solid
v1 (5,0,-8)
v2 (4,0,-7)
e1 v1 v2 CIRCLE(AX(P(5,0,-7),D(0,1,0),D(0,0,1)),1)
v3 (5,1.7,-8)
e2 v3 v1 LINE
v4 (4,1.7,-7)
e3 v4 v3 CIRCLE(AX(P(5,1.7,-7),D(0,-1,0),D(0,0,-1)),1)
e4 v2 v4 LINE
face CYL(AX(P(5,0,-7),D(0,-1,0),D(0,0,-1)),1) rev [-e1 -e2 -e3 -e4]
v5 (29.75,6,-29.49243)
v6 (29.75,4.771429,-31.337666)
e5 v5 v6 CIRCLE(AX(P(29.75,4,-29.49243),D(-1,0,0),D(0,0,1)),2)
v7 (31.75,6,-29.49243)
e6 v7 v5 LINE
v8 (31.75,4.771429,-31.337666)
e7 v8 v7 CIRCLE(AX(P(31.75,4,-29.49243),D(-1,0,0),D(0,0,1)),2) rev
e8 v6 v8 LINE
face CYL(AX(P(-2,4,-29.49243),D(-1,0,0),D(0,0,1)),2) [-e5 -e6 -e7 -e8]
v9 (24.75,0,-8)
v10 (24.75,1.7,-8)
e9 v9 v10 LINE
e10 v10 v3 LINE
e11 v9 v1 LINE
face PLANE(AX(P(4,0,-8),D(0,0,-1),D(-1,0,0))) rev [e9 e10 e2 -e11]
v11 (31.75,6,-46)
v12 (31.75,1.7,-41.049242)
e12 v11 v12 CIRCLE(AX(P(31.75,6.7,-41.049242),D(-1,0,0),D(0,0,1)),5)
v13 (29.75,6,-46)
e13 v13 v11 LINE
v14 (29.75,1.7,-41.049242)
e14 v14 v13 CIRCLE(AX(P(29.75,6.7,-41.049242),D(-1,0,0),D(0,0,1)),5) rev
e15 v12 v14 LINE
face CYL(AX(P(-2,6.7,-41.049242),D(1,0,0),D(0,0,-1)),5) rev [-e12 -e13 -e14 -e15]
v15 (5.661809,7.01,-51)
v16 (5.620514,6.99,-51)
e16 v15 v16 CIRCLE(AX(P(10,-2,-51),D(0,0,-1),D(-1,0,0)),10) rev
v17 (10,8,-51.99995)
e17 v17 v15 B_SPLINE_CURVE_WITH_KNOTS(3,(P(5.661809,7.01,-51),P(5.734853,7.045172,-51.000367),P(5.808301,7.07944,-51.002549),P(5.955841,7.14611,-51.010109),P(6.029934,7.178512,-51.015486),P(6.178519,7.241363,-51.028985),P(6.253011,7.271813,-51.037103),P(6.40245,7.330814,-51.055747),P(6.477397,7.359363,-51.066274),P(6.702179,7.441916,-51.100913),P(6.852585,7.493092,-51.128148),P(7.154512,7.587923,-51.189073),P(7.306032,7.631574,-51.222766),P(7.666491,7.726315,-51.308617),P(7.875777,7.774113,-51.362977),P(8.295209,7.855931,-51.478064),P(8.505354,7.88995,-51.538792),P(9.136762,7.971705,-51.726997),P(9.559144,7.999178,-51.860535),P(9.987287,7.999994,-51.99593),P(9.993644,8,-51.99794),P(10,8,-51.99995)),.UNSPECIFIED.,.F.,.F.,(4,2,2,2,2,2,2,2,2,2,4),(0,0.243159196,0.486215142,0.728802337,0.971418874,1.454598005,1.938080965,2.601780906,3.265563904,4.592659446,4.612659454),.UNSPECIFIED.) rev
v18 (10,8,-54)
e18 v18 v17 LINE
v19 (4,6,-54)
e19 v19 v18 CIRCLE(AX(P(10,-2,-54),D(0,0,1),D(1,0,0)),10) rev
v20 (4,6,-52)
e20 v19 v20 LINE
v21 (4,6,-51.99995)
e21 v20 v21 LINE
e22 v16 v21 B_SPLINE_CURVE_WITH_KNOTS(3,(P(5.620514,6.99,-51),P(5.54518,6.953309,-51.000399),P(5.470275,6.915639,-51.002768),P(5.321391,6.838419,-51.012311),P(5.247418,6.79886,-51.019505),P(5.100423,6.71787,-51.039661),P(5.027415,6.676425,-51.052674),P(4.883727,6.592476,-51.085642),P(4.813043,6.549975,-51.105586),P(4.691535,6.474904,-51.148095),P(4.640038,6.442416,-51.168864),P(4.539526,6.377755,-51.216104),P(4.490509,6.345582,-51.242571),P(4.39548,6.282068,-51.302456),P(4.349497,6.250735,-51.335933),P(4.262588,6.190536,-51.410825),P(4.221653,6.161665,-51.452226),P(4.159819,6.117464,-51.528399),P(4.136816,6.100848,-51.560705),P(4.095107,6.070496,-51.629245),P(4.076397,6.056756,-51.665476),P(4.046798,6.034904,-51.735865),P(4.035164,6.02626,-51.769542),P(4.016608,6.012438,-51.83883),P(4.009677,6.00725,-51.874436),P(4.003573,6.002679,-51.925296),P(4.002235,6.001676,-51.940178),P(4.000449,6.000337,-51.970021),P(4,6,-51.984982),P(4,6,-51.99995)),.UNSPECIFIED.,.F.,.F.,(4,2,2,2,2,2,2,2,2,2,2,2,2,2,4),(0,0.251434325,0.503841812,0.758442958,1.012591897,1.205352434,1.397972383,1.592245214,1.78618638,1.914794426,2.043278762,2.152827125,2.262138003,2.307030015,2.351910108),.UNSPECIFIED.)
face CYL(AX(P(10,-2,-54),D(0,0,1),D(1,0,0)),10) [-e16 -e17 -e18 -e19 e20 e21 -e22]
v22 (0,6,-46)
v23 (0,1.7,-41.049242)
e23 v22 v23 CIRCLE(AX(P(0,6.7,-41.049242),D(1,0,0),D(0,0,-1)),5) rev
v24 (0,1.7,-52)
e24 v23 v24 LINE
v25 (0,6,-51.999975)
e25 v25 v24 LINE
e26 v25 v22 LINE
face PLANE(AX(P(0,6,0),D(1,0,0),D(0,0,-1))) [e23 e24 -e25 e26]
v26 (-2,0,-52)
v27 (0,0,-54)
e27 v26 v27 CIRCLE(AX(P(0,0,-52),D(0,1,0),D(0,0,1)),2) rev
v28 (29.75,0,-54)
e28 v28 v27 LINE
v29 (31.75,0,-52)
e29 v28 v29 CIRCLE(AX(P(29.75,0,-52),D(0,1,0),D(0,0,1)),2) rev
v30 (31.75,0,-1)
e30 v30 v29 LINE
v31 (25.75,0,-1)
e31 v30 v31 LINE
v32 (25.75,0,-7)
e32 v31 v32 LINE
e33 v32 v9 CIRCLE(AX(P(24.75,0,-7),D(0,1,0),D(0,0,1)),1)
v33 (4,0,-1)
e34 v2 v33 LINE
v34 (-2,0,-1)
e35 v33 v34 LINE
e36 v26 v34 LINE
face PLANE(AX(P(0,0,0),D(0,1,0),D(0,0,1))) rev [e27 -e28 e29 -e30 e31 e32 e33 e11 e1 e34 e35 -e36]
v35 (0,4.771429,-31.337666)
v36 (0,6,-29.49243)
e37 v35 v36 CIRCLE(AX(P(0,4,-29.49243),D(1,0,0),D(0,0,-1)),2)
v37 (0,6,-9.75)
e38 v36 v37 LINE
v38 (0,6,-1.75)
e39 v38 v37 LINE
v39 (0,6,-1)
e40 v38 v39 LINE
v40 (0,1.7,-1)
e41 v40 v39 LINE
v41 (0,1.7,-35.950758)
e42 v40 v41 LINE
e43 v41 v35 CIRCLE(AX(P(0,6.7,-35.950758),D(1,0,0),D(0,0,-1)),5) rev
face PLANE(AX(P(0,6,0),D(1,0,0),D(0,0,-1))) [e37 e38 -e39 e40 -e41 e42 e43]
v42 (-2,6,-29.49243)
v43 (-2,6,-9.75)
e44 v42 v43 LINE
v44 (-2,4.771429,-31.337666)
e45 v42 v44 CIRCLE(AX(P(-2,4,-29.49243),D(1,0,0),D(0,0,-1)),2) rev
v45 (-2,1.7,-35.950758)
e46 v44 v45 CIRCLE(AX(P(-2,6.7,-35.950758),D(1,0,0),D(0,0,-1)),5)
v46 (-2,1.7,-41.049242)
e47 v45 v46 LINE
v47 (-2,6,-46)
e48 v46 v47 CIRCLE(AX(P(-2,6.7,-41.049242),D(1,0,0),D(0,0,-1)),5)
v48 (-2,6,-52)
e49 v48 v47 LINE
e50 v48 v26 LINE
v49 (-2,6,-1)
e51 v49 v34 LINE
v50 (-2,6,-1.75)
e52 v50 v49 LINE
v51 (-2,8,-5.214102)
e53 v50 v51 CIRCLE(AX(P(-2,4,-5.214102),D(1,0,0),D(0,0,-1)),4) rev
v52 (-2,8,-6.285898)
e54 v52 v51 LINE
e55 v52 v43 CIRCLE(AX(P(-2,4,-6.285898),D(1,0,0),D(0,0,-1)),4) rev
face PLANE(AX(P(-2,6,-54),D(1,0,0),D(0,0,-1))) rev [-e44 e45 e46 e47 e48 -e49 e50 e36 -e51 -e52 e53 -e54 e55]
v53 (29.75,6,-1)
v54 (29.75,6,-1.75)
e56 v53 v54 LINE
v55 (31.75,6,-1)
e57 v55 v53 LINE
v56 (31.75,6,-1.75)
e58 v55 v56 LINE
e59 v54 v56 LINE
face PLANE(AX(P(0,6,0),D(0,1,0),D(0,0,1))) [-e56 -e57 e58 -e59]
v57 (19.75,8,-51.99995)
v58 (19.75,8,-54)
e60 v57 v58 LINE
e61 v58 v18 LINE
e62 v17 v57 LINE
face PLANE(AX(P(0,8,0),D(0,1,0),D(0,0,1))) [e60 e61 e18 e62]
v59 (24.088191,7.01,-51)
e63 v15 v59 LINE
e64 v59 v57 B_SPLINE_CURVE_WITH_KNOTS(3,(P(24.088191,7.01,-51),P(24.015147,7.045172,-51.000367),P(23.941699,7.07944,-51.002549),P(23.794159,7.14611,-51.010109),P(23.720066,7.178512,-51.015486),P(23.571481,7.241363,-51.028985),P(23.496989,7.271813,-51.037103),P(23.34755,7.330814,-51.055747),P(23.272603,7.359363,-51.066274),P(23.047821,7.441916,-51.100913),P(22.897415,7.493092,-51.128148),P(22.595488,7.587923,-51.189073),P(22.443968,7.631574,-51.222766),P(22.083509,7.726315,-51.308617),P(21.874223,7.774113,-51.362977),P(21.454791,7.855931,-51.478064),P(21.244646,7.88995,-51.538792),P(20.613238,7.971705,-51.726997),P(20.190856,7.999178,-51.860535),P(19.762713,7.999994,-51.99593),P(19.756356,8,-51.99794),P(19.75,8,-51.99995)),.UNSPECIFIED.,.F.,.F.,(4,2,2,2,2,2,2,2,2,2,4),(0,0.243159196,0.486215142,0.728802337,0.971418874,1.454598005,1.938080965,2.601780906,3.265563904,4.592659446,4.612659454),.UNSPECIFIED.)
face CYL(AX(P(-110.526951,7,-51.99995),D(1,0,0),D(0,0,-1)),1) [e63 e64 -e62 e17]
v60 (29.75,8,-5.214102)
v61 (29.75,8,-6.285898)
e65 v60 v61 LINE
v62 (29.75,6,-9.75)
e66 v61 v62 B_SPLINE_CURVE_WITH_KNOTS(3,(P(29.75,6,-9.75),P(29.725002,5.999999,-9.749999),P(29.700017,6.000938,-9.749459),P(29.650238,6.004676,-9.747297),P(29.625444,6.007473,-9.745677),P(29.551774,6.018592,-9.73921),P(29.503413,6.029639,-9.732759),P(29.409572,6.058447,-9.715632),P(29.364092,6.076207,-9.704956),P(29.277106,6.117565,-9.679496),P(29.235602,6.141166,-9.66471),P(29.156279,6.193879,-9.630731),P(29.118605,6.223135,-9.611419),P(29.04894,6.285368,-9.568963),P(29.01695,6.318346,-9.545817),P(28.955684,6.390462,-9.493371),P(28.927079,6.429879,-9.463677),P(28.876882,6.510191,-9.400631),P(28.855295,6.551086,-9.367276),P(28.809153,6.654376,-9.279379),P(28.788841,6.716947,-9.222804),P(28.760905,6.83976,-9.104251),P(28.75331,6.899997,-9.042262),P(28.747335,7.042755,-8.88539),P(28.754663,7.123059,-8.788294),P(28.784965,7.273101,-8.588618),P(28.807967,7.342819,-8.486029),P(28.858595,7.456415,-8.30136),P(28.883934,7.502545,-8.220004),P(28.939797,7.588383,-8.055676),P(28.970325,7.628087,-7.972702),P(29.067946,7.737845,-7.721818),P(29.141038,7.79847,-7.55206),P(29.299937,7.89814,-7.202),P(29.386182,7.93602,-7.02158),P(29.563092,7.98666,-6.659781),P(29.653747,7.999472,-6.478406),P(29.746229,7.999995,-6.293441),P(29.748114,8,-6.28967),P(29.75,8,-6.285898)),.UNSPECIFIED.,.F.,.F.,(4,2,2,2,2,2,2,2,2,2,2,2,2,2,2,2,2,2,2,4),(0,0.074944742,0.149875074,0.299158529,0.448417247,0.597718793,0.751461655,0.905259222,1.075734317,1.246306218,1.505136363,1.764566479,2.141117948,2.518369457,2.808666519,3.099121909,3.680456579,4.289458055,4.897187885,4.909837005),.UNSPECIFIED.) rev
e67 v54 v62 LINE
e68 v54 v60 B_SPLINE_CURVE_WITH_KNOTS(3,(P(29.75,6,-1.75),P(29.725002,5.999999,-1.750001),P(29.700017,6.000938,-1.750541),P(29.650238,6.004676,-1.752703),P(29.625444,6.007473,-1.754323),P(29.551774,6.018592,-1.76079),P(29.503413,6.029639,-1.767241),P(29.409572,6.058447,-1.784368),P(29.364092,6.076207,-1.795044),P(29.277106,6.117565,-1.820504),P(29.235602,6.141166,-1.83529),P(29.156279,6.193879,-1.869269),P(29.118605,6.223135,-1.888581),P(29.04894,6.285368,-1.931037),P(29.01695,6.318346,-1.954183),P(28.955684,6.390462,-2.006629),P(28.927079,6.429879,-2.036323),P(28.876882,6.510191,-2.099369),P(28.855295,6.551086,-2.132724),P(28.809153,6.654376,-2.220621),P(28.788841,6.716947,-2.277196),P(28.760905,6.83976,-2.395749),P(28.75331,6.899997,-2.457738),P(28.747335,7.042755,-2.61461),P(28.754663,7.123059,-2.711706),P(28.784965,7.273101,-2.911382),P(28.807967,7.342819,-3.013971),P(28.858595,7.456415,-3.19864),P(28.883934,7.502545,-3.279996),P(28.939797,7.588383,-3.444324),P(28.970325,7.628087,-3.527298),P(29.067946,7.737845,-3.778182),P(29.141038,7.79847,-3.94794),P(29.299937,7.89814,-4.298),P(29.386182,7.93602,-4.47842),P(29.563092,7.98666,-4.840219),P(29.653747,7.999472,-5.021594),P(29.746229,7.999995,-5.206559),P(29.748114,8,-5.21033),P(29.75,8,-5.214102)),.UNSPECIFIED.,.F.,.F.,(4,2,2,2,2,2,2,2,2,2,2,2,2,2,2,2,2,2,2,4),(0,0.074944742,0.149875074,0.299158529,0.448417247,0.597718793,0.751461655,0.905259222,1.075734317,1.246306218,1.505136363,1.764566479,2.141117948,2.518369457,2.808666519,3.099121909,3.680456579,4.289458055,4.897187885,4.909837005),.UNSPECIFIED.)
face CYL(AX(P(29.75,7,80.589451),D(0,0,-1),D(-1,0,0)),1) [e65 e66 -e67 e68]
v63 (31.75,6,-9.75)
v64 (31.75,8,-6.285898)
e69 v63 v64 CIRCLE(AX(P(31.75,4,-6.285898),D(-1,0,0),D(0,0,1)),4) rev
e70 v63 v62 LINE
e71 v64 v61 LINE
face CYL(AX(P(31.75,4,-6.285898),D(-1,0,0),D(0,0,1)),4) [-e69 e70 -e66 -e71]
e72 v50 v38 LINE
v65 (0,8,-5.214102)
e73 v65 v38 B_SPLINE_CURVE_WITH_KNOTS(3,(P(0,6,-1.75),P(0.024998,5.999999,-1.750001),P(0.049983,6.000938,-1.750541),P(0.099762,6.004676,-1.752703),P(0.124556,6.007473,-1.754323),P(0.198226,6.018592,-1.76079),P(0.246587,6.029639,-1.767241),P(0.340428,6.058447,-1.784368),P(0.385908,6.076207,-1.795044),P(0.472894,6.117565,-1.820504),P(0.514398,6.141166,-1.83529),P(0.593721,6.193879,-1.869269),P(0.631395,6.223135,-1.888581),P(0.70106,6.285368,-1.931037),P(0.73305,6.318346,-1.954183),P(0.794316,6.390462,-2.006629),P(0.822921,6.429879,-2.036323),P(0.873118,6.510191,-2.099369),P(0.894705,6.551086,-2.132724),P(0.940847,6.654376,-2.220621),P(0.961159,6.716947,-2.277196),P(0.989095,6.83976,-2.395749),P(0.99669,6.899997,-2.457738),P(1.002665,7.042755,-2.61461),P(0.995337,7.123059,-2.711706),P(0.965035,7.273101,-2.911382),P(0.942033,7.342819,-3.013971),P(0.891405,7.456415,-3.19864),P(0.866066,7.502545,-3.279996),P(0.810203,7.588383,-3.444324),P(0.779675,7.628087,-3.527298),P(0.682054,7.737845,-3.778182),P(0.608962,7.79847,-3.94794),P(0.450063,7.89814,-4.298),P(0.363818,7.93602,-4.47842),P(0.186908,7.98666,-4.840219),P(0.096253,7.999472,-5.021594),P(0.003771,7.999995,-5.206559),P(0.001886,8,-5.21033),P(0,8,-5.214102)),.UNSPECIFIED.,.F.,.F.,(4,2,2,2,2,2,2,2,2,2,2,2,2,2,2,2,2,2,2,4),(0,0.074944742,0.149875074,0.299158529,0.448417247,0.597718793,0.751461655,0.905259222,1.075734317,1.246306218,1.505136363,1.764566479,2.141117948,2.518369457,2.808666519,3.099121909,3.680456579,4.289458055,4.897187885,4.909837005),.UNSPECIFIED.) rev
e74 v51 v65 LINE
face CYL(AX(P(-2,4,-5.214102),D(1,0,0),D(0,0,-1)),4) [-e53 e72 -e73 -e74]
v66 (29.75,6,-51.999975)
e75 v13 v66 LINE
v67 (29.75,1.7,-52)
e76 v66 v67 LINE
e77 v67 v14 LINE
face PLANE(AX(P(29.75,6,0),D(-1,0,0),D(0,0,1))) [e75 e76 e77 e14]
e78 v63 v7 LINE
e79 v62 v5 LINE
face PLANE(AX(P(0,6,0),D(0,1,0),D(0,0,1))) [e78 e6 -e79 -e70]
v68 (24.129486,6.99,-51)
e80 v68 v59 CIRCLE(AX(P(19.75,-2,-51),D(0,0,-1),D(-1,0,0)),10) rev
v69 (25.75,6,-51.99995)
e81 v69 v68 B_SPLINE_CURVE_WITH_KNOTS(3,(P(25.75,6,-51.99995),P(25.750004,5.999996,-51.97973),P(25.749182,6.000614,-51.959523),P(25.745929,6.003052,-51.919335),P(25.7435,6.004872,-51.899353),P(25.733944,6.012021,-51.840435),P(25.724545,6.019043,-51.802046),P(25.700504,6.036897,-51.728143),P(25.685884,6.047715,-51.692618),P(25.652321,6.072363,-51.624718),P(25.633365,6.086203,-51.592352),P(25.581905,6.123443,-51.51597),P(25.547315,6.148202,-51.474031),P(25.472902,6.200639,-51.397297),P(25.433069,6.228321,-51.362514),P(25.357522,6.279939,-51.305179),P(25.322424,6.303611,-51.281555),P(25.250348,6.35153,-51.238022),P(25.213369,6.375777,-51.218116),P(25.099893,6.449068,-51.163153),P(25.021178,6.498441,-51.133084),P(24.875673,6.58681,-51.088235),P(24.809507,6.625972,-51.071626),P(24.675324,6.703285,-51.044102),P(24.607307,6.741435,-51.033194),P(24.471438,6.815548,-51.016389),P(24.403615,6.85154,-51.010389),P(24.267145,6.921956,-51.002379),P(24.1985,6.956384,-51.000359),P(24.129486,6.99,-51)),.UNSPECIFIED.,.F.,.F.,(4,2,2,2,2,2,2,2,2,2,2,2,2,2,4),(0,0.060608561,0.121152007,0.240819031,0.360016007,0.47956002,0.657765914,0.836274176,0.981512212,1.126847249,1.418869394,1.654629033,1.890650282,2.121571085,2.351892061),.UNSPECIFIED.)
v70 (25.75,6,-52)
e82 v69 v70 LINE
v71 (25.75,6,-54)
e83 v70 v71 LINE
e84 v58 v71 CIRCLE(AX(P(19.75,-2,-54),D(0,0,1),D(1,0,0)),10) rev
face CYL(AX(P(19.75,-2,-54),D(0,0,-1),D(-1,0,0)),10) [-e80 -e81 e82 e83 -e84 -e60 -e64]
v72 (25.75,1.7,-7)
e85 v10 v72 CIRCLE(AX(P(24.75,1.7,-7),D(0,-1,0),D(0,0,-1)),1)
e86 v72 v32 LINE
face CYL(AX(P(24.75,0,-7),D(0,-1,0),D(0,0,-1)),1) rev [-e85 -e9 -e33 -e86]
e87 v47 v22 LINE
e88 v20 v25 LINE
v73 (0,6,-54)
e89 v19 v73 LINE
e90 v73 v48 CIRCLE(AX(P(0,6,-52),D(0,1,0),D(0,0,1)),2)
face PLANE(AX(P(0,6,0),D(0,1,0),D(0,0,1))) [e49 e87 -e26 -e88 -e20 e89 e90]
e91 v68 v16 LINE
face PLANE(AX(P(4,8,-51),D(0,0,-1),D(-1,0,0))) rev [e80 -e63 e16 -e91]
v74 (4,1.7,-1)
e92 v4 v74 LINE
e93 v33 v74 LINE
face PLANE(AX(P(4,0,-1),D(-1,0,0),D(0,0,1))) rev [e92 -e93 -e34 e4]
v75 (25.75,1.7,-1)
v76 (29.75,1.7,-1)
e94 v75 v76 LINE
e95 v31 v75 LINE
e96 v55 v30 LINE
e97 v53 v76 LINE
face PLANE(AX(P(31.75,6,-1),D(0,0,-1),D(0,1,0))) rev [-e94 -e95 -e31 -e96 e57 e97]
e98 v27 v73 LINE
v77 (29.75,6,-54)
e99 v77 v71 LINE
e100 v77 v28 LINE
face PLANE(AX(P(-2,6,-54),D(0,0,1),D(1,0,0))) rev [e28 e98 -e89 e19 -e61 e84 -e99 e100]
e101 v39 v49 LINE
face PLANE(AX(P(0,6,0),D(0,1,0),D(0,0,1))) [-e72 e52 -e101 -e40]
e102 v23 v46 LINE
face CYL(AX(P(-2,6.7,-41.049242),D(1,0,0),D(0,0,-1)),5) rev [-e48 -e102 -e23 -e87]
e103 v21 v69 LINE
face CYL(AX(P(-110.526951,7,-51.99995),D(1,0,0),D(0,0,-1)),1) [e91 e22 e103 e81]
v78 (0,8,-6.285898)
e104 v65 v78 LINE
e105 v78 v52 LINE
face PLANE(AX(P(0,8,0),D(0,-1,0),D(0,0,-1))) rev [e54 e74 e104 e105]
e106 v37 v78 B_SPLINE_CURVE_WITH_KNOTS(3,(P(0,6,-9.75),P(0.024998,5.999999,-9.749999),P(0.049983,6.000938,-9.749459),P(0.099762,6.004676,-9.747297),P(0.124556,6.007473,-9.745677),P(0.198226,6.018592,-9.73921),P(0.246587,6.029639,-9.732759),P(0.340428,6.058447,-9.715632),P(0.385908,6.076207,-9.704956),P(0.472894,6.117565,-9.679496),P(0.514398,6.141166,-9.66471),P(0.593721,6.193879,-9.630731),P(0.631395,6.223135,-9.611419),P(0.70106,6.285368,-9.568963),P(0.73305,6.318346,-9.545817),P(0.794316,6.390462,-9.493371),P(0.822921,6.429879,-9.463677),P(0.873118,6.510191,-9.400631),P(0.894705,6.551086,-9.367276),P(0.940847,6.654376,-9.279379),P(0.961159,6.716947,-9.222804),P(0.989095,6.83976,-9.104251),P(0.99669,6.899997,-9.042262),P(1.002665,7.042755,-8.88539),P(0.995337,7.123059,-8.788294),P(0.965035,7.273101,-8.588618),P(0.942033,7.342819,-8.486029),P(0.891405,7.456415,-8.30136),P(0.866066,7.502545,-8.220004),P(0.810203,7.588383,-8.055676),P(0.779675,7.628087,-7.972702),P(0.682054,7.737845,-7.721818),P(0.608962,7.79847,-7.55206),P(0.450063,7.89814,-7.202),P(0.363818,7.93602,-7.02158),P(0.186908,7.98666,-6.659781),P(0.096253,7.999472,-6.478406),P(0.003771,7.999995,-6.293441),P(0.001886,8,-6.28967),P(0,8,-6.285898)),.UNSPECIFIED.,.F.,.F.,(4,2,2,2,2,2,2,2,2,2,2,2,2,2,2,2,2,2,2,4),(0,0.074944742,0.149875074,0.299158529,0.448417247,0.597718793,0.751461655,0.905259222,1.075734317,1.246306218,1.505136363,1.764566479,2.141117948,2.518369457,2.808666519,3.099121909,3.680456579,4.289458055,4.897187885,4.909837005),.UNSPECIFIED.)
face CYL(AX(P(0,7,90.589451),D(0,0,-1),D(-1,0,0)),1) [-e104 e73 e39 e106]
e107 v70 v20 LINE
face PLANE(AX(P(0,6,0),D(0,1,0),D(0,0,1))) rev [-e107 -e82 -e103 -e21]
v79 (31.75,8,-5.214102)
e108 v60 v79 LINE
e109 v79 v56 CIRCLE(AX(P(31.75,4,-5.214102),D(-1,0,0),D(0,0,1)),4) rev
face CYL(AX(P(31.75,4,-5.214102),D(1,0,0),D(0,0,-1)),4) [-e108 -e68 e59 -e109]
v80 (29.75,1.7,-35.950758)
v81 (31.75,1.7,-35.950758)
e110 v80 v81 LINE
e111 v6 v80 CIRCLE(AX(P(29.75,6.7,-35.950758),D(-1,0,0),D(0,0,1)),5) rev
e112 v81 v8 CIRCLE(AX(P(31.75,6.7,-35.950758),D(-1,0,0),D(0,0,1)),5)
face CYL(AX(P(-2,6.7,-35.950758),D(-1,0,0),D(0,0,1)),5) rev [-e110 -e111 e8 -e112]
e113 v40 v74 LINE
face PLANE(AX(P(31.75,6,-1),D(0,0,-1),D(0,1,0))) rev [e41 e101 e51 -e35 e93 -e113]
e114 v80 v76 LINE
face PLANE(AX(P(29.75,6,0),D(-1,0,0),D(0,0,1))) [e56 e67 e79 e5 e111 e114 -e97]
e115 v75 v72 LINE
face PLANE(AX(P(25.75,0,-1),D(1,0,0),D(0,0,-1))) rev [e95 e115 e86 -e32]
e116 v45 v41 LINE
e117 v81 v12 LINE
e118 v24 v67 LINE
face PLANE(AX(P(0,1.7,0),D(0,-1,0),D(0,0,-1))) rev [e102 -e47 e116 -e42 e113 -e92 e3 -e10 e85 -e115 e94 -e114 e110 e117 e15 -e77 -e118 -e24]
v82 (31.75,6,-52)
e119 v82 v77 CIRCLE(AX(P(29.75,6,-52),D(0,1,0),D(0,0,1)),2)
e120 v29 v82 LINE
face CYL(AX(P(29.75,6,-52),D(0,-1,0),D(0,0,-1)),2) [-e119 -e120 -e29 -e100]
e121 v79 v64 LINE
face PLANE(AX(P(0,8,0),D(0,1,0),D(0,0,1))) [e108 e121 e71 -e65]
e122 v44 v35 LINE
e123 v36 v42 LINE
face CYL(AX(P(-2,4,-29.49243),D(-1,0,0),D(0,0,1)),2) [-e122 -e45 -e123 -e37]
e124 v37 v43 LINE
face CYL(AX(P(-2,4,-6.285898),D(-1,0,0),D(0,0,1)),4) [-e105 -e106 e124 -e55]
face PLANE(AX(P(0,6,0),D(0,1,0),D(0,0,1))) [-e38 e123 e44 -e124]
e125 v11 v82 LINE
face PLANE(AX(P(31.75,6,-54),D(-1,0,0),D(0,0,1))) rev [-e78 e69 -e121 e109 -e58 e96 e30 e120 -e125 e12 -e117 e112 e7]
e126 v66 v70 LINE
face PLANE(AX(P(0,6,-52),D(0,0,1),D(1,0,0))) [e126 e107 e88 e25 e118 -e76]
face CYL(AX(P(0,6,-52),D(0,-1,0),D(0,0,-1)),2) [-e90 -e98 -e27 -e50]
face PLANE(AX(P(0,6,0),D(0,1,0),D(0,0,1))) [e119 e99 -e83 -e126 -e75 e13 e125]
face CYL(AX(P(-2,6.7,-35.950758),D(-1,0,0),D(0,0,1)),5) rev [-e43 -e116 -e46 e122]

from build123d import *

# Parameters (mm, degrees)
SKETCH1_W               = 33.75000000000001
SKETCH1_H               = 55.99999999999999
SKETCH1_W_2             = 29.750000000000004
SKETCH1_H_2             = 52.00000000000001
BOSS_EXTRUDE1_DEPTH     = 6
BOSS_EXTRUDE2_DEPTH     = 1.7
SKETCH3_W               = 29.750000000000004
SKETCH3_H               = 4.3
CUT_EXTRUDE1_DEPTH      = 63.92902748334825
SKETCH5_W               = 21.750000000000004
SKETCH5_H               = 2.999999999999986
SKETCH5_W_2             = 2.9999999999999996
SKETCH5_H_2             = 8
BOSS_EXTRUDE3_DEPTH     = 2
CUT_EXTRUDE2_DEPTH      = 62.66137364671663
CUT_EXTRUDE2_DEPTH_BACK = 62.66137364671663
CUT_EXTRUDE3_DEPTH      = 62.66137364671663
CUT_EXTRUDE3_DEPTH_BACK = 62.66137364671663
CUT_EXTRUDE4_START      = -21.75
CUT_EXTRUDE4_DEPTH      = 21.75
FILLET1_R               = 10
FILLET2_R               = 4
CUT_EXTRUDE5_DEPTH      = 65.17992314238798
SKETCH12_W              = 21.750000000000004
SKETCH12_H              = 6.999999999999999
CUT_EXTRUDE6_DEPTH      = 63.958339642557306
FILLET4_R               = 2
FILLET5_R               = 1
CUT_EXTRUDE7_DEPTH      = 64.15110873264877
CUT_EXTRUDE7_DEPTH_BACK = 64.15110873264877
SKETCH13_W              = 14.999999999999996
SKETCH13_H              = 4.300000000000001
FILLET6_R               = 5
FILLET7_R               = 2


# Read off the part's stored shape, not the designer's step: Cut-Extrude4
with BuildPart() as part:
    # Sketch1 → Boss-Extrude1 (new body)
    with BuildSketch(Plane(origin=(0, 0, 0), x_dir=(1, 0, 0), z_dir=(0, 1, 0))):
        with Locations((14.875000000000002, 25.999999999999996)):
            Rectangle(SKETCH1_W, SKETCH1_H)
        with Locations((14.875000000000002, 26.000000000000004)):
            Rectangle(SKETCH1_W_2, SKETCH1_H_2, mode=Mode.SUBTRACT)
    extrude(amount=BOSS_EXTRUDE1_DEPTH)

    # Sketch2 → Boss-Extrude2 (add)
    with BuildSketch(Plane.XZ):
        Polygon((-1.9999999999999996, 2), (31.749999999999993, 2), (31.75, -53.99999999999999), (-1.9999999999999927, -53.99999999999999), align=None)
    extrude(amount=-BOSS_EXTRUDE2_DEPTH)

    # Sketch3 → Cut-Extrude1 (cut, through all)
    with BuildSketch(Plane(origin=(0, 0, 0), x_dir=(-1, 0, 0), z_dir=(0, 0, -1))):
        with Locations((-14.875000000000002, 3.85)):
            Rectangle(SKETCH3_W, SKETCH3_H)
    extrude(amount=-CUT_EXTRUDE1_DEPTH, mode=Mode.SUBTRACT)

    # Sketch5 → Boss-Extrude3 (add)
    with BuildSketch(Plane(origin=(0, 6, 0), x_dir=(1, 0, 0), z_dir=(0, 1, 0))):
        with Locations((14.875000000000002, 52.5)):
            Rectangle(SKETCH5_W, SKETCH5_H)
        with Locations((-0.4999999999999998, 5.75)):
            Rectangle(SKETCH5_W_2, SKETCH5_H_2)
        Polygon((31.750000000000014, 9.750000000000004), (28.75000000000001, 9.750000000000004), (28.750000000000014, 1.7500000000000033), (31.75000000000002, 1.750000000000004), align=None)
    extrude(amount=BOSS_EXTRUDE3_DEPTH)

    # Sketch6 → Cut-Extrude2 (cut, two sides: drawn at the far end of the back side and taken through both)
    with BuildSketch(Plane.XY.offset(-1.7499999999999998).offset(-CUT_EXTRUDE2_DEPTH_BACK)):
        with BuildLine():
            Line((1, 8), (0, 8))
            ThreePointArc((0, 8), (0.7071067811865474, 7.707106781186548), (1.0000000000000002, 7.000000000000001))
            Line((1, 7.000000000000001), (1, 8))
        make_face()
        with BuildLine():
            Line((1, 6), (1, 7.000000000000001))
            ThreePointArc((1.0000000000000002, 7.000000000000001), (0.7071067811865479, 6.292893218813453), (1.2e-16, 6))
            Line((0, 6), (1, 6))
        make_face()
    extrude(amount=CUT_EXTRUDE2_DEPTH + CUT_EXTRUDE2_DEPTH_BACK, mode=Mode.SUBTRACT)

    # Sketch7 → Cut-Extrude3 (cut, two sides: drawn at the far end of the back side and taken through both)
    with BuildSketch(Plane.XY.offset(-1.749999999999997).offset(-CUT_EXTRUDE3_DEPTH_BACK)):
        with BuildLine():
            Line((28.750000000000014, 6), (29.75, 6))
            ThreePointArc((29.75, 6), (29.042893218813454, 6.292893218813452), (28.75, 7))
            Line((28.750000000000014, 7), (28.750000000000014, 6))
        make_face()
        with BuildLine():
            Line((28.750000000000014, 8), (28.750000000000014, 7))
            ThreePointArc((28.75, 7), (29.042893218813454, 7.707106781186548), (29.75, 8))
            Line((29.75, 8), (28.750000000000014, 8))
        make_face()
    extrude(amount=CUT_EXTRUDE3_DEPTH + CUT_EXTRUDE3_DEPTH_BACK, mode=Mode.SUBTRACT)

    # Cut-Extrude4 outline → Cut-Extrude4 (cut)
    with BuildSketch(Plane.ZY.offset(-4).offset(CUT_EXTRUDE4_START)):
        with BuildLine():
            Line((-51, 6), (-51, 6.99))
            ThreePointArc((-51, 6.99), (-51.296387635, 6.289366479), (-51.99995, 5.999999999))
            Line((-51.99995, 5.999999999), (-51, 6))
        make_face()
        with BuildLine():
            ThreePointArc((-51.99995, 8.000000001), (-51.296387635, 7.710633521), (-51, 7.01))
            Line((-51, 7.01), (-51, 8))
            Line((-51, 8), (-51.99995, 8.000000001))
        make_face()
    extrude(amount=CUT_EXTRUDE4_DEPTH, mode=Mode.SUBTRACT)

    # Fillet1
    # the kernel refuses this fillet: 10 mm, written as the material it takes off along each edge
    with BuildSketch(Plane(origin=(4, 8, -36.99994999999842), x_dir=(1.1324e-13, -1, 0), z_dir=(0, 0, -1))) as fillet1_piece_1:
        with BuildLine():
            CenterArc((10.000000000000679, -5.999999999999498), FILLET1_R, 143.13010235415956, 36.86989764584689)
            Line((6.7946e-13, -6.000000000000631), (-0.19999999999931983, -6.000000000000653))
            Line((-0.19999999999931983, -6.000000000000653), (-0.1999999999999993, -2.265e-14))
            Line((-0.1999999999999993, -2.265e-14), (-2.265e-14, 0.20000000000000018))
            ThreePointArc((-2.265e-14, 0.20000000000000018), (1.0000000000001283, 0.20000000000011342), (1.8400000000002954, 0.11999999999998998))
            Line((1.8400000000002954, 0.11999999999998998), (2.000000000000303, 0))
        make_face()
    extrude(amount=32.00005000000314, mode=Mode.SUBTRACT)
    with BuildSketch(Plane(origin=(25.750000000000004, 8, -69.00000000000158), x_dir=(-1, 0, 0), z_dir=(0, 0, 1))) as fillet1_piece_2:
        with BuildLine():
            CenterArc((6.000000000000632, 10), FILLET1_R, 233.13010235415308, 36.86989764584689)
            Line((2.2737e-13, 2.0000000000003038), (-0.11999999999978073, 1.8400000000003098))
            ThreePointArc((-0.11999999999978073, 1.8400000000003098), (-0.1999999999999993, 1.0000000000001519), (-0.1999999999999993, 0))
            Line((-0.1999999999999993, 0), (0, -0.1999999999999993))
            Line((0, -0.1999999999999993), (6.000000000000632, -0.1999999999999993))
            Line((6.000000000000632, -0.1999999999999993), (6.000000000000632, 0))
        make_face()
    extrude(amount=32.00005000000316, mode=Mode.SUBTRACT)

    # Fillet2
    # the kernel refuses this fillet: 4 mm, written as the material it takes off along each edge
    with BuildSketch(Plane(origin=(8.66025403784487, 8, -9.75), x_dir=(0, -1, 7.283e-14), z_dir=(-1, 0, 0))) as fillet2_piece_1:
        with BuildLine():
            CenterArc((4.000000000000252, 3.4641016151376567), FILLET2_R, 179.99999999999582, 60.000000000001364)
            Line((2.5229e-13, 3.464101615137948), (-0.07999999999974777, 3.464101615137954))
            Line((-0.07999999999974777, 3.464101615137954), (-0.08000000000000007, 5.83e-15))
            Line((-0.08000000000000007, 5.83e-15), (-5.83e-15, -0.08000000000000007))
            ThreePointArc((-5.83e-15, -0.08000000000000007), (1.000000000000036, -0.0800000000000729), (1.9600000000000801, -0.06928203230275251))
            Line((1.9600000000000801, -0.06928203230275251), (2.0000000000000835, 0))
        make_face()
    extrude(amount=19.32050807568974, mode=Mode.SUBTRACT)
    with BuildSketch(Plane(origin=(-10.66025403784487, 8, -1.7499999999999998), x_dir=(0, -1, -7.25e-14), z_dir=(1, 0, 0))) as fillet2_piece_2:
        with BuildLine():
            CenterArc((4.000000000000251, 3.464101615137658), FILLET2_R, 179.99999999999585, 60.000000000001364)
            Line((2.5114e-13, 3.464101615137948), (-0.07999999999974894, 3.464101615137954))
            Line((-0.07999999999974894, 3.464101615137954), (-0.08000000000000007, 5.8e-15))
            Line((-0.08000000000000007, 5.8e-15), (-5.8e-15, -0.08000000000000007))
            ThreePointArc((-5.8e-15, -0.08000000000000007), (1.000000000000036, -0.08000000000007257), (1.9600000000000801, -0.06928203230275319))
            Line((1.9600000000000801, -0.06928203230275319), (2.0000000000000835, 0))
        make_face()
    extrude(amount=19.32050807568974, mode=Mode.SUBTRACT)
    with BuildSketch(Plane(origin=(40.41025403784491, 8, -9.750000000000004), x_dir=(0, -1, 7.55e-14), z_dir=(-1, 0, 0))) as fillet2_piece_3:
        with BuildLine():
            CenterArc((4.000000000000261, 3.464101615137654), FILLET2_R, 179.99999999999568, 60.00000000000142)
            Line((2.6152e-13, 3.464101615137956), (-0.07999999999973854, 3.464101615137962))
            Line((-0.07999999999973854, 3.464101615137962), (-0.08000000000000007, 6.04e-15))
            Line((-0.08000000000000007, 6.04e-15), (-6.04e-15, -0.08000000000000007))
            ThreePointArc((-6.04e-15, -0.08000000000000007), (1.0000000000000375, -0.08000000000007557), (1.9600000000000835, -0.0692820323027524))
            Line((1.9600000000000835, -0.0692820323027524), (2.000000000000087, 0))
        make_face()
    extrude(amount=19.320508075689798, mode=Mode.SUBTRACT)
    with BuildSketch(Plane(origin=(21.08974596215511, 8, -1.7500000000000018), x_dir=(-2.2e-16, 0, -1), z_dir=(1, 0, -2.2e-16))) as fillet2_piece_4:
        with BuildLine():
            CenterArc((3.464101615137956, -4), FILLET2_R, 90, 60.00000000000145)
            Line((1.5055e-13, -2.000000000000087), (-0.06928203230260555, -1.9600000000000888))
            ThreePointArc((-0.06928203230260555, -1.9600000000000888), (-0.0800000000000003, -1.0000000000000435), (-0.08000000000000007, 0))
            Line((-0.08000000000000007, 0), (0, 0.08000000000000007))
            Line((0, 0.08000000000000007), (3.464101615137956, 0.08000000000000007))
            Line((3.464101615137956, 0.08000000000000007), (3.464101615137956, 0))
        make_face()
    extrude(amount=19.320508075689798, mode=Mode.SUBTRACT)

    # Sketch11 → Cut-Extrude5 (cut, through all)
    with BuildSketch(Plane.ZY.offset(2.000000000000001)):
        Polygon((2, 6), (-1, 6), (-1.0000000000000009, 0), (2, 0), align=None)
    extrude(amount=-CUT_EXTRUDE5_DEPTH, mode=Mode.SUBTRACT)

    # Sketch12 → Cut-Extrude6 (cut, through all)
    with BuildSketch(Plane(origin=(0, 1.7, 0), x_dir=(1, 0, 0), z_dir=(0, 1, 0))):
        with Locations((14.875000000000002, 4.5)):
            Rectangle(SKETCH12_W, SKETCH12_H)
    extrude(amount=-CUT_EXTRUDE6_DEPTH, mode=Mode.SUBTRACT)

    # Fillet4
    fillet4_edges = [part.edges().sort_by_distance(p)[0] for p in [
        (-1.9999999999999987, 3, -53.99999999999999),
        (31.75, 3, -53.99999999999999),
    ]]
    fillet(fillet4_edges, radius=FILLET4_R)

    # Fillet5
    fillet5_edges = [part.edges().sort_by_distance(p)[0] for p in [
        (4, 0.85, -8),
        (25.75, 0.85, -8),
    ]]
    fillet(fillet5_edges, radius=FILLET5_R)

    # Sketch13 → Cut-Extrude7 (cut, two sides: drawn at the far end of the back side and taken through both)
    with BuildSketch(Plane(origin=(0, 0, 0), x_dir=(0, 0, -1), z_dir=(1, 0, 0)).offset(-CUT_EXTRUDE7_DEPTH_BACK)):
        with Locations((38.5, 3.8499999999999996)):
            Rectangle(SKETCH13_W, SKETCH13_H)
    extrude(amount=CUT_EXTRUDE7_DEPTH + CUT_EXTRUDE7_DEPTH_BACK, mode=Mode.SUBTRACT)

    # Fillet6
    # the kernel refuses this fillet: 5 mm, written as the material it adds along each edge
    with BuildSketch(Plane(origin=(31.75, 1.7, -46), x_dir=(0, 4e-17, 1), z_dir=(-1, 0, 0)), Plane(origin=(0, 1.7, -46), x_dir=(0, 4e-17, 1), z_dir=(-1, 0, 0))) as fillet6_piece_1:
        with BuildLine():
            CenterArc((4.9507575177946705, 5), FILLET6_R, 188.04784624731144, 81.95215375268856)
            Line((4.283e-14, 4.300000000000006), (-0.09901515035584632, 4.286000000000006))
            ThreePointArc((-0.09901515035584632, 4.286000000000006), (-0.10000000000000132, 2.150000000000003), (-0.10000000000000142, 0))
            Line((-0.10000000000000142, 0), (0, -0.10000000000000009))
            Line((0, -0.10000000000000009), (4.9507575177946705, -0.10000000000000009))
            Line((4.9507575177946705, -0.10000000000000009), (4.9507575177946705, 0))
        make_face()
    extrude(amount=2)
    with BuildSketch(Plane(origin=(29.75, 1.7, -31), x_dir=(0, 4e-17, -1), z_dir=(1, 0, 0)), Plane(origin=(-2, 1.7, -31), x_dir=(0, 4e-17, -1), z_dir=(1, 0, 0))) as fillet6_piece_2:
        with BuildLine():
            CenterArc((4.9507575177946705, 5), FILLET6_R, 188.04784624731144, 81.95215375268856)
            Line((4.283e-14, 4.300000000000006), (-0.09901515035584987, 4.286000000000006))
            ThreePointArc((-0.09901515035584987, 4.286000000000006), (-0.10000000000000132, 2.150000000000003), (-0.10000000000000142, 0))
            Line((-0.10000000000000142, 0), (0, -0.10000000000000009))
            Line((0, -0.10000000000000009), (4.9507575177946705, -0.10000000000000009))
            Line((4.9507575177946705, -0.10000000000000009), (4.9507575177946705, 0))
        make_face()
    extrude(amount=2)

    # Fillet7
    fillet7_edges = [part.edges().sort_by_distance(p)[0] for p in [
        (-1, 6, -31),
        (30.75, 6, -31),
    ]]
    fillet(fillet7_edges, radius=FILLET7_R)


solid = part.part
